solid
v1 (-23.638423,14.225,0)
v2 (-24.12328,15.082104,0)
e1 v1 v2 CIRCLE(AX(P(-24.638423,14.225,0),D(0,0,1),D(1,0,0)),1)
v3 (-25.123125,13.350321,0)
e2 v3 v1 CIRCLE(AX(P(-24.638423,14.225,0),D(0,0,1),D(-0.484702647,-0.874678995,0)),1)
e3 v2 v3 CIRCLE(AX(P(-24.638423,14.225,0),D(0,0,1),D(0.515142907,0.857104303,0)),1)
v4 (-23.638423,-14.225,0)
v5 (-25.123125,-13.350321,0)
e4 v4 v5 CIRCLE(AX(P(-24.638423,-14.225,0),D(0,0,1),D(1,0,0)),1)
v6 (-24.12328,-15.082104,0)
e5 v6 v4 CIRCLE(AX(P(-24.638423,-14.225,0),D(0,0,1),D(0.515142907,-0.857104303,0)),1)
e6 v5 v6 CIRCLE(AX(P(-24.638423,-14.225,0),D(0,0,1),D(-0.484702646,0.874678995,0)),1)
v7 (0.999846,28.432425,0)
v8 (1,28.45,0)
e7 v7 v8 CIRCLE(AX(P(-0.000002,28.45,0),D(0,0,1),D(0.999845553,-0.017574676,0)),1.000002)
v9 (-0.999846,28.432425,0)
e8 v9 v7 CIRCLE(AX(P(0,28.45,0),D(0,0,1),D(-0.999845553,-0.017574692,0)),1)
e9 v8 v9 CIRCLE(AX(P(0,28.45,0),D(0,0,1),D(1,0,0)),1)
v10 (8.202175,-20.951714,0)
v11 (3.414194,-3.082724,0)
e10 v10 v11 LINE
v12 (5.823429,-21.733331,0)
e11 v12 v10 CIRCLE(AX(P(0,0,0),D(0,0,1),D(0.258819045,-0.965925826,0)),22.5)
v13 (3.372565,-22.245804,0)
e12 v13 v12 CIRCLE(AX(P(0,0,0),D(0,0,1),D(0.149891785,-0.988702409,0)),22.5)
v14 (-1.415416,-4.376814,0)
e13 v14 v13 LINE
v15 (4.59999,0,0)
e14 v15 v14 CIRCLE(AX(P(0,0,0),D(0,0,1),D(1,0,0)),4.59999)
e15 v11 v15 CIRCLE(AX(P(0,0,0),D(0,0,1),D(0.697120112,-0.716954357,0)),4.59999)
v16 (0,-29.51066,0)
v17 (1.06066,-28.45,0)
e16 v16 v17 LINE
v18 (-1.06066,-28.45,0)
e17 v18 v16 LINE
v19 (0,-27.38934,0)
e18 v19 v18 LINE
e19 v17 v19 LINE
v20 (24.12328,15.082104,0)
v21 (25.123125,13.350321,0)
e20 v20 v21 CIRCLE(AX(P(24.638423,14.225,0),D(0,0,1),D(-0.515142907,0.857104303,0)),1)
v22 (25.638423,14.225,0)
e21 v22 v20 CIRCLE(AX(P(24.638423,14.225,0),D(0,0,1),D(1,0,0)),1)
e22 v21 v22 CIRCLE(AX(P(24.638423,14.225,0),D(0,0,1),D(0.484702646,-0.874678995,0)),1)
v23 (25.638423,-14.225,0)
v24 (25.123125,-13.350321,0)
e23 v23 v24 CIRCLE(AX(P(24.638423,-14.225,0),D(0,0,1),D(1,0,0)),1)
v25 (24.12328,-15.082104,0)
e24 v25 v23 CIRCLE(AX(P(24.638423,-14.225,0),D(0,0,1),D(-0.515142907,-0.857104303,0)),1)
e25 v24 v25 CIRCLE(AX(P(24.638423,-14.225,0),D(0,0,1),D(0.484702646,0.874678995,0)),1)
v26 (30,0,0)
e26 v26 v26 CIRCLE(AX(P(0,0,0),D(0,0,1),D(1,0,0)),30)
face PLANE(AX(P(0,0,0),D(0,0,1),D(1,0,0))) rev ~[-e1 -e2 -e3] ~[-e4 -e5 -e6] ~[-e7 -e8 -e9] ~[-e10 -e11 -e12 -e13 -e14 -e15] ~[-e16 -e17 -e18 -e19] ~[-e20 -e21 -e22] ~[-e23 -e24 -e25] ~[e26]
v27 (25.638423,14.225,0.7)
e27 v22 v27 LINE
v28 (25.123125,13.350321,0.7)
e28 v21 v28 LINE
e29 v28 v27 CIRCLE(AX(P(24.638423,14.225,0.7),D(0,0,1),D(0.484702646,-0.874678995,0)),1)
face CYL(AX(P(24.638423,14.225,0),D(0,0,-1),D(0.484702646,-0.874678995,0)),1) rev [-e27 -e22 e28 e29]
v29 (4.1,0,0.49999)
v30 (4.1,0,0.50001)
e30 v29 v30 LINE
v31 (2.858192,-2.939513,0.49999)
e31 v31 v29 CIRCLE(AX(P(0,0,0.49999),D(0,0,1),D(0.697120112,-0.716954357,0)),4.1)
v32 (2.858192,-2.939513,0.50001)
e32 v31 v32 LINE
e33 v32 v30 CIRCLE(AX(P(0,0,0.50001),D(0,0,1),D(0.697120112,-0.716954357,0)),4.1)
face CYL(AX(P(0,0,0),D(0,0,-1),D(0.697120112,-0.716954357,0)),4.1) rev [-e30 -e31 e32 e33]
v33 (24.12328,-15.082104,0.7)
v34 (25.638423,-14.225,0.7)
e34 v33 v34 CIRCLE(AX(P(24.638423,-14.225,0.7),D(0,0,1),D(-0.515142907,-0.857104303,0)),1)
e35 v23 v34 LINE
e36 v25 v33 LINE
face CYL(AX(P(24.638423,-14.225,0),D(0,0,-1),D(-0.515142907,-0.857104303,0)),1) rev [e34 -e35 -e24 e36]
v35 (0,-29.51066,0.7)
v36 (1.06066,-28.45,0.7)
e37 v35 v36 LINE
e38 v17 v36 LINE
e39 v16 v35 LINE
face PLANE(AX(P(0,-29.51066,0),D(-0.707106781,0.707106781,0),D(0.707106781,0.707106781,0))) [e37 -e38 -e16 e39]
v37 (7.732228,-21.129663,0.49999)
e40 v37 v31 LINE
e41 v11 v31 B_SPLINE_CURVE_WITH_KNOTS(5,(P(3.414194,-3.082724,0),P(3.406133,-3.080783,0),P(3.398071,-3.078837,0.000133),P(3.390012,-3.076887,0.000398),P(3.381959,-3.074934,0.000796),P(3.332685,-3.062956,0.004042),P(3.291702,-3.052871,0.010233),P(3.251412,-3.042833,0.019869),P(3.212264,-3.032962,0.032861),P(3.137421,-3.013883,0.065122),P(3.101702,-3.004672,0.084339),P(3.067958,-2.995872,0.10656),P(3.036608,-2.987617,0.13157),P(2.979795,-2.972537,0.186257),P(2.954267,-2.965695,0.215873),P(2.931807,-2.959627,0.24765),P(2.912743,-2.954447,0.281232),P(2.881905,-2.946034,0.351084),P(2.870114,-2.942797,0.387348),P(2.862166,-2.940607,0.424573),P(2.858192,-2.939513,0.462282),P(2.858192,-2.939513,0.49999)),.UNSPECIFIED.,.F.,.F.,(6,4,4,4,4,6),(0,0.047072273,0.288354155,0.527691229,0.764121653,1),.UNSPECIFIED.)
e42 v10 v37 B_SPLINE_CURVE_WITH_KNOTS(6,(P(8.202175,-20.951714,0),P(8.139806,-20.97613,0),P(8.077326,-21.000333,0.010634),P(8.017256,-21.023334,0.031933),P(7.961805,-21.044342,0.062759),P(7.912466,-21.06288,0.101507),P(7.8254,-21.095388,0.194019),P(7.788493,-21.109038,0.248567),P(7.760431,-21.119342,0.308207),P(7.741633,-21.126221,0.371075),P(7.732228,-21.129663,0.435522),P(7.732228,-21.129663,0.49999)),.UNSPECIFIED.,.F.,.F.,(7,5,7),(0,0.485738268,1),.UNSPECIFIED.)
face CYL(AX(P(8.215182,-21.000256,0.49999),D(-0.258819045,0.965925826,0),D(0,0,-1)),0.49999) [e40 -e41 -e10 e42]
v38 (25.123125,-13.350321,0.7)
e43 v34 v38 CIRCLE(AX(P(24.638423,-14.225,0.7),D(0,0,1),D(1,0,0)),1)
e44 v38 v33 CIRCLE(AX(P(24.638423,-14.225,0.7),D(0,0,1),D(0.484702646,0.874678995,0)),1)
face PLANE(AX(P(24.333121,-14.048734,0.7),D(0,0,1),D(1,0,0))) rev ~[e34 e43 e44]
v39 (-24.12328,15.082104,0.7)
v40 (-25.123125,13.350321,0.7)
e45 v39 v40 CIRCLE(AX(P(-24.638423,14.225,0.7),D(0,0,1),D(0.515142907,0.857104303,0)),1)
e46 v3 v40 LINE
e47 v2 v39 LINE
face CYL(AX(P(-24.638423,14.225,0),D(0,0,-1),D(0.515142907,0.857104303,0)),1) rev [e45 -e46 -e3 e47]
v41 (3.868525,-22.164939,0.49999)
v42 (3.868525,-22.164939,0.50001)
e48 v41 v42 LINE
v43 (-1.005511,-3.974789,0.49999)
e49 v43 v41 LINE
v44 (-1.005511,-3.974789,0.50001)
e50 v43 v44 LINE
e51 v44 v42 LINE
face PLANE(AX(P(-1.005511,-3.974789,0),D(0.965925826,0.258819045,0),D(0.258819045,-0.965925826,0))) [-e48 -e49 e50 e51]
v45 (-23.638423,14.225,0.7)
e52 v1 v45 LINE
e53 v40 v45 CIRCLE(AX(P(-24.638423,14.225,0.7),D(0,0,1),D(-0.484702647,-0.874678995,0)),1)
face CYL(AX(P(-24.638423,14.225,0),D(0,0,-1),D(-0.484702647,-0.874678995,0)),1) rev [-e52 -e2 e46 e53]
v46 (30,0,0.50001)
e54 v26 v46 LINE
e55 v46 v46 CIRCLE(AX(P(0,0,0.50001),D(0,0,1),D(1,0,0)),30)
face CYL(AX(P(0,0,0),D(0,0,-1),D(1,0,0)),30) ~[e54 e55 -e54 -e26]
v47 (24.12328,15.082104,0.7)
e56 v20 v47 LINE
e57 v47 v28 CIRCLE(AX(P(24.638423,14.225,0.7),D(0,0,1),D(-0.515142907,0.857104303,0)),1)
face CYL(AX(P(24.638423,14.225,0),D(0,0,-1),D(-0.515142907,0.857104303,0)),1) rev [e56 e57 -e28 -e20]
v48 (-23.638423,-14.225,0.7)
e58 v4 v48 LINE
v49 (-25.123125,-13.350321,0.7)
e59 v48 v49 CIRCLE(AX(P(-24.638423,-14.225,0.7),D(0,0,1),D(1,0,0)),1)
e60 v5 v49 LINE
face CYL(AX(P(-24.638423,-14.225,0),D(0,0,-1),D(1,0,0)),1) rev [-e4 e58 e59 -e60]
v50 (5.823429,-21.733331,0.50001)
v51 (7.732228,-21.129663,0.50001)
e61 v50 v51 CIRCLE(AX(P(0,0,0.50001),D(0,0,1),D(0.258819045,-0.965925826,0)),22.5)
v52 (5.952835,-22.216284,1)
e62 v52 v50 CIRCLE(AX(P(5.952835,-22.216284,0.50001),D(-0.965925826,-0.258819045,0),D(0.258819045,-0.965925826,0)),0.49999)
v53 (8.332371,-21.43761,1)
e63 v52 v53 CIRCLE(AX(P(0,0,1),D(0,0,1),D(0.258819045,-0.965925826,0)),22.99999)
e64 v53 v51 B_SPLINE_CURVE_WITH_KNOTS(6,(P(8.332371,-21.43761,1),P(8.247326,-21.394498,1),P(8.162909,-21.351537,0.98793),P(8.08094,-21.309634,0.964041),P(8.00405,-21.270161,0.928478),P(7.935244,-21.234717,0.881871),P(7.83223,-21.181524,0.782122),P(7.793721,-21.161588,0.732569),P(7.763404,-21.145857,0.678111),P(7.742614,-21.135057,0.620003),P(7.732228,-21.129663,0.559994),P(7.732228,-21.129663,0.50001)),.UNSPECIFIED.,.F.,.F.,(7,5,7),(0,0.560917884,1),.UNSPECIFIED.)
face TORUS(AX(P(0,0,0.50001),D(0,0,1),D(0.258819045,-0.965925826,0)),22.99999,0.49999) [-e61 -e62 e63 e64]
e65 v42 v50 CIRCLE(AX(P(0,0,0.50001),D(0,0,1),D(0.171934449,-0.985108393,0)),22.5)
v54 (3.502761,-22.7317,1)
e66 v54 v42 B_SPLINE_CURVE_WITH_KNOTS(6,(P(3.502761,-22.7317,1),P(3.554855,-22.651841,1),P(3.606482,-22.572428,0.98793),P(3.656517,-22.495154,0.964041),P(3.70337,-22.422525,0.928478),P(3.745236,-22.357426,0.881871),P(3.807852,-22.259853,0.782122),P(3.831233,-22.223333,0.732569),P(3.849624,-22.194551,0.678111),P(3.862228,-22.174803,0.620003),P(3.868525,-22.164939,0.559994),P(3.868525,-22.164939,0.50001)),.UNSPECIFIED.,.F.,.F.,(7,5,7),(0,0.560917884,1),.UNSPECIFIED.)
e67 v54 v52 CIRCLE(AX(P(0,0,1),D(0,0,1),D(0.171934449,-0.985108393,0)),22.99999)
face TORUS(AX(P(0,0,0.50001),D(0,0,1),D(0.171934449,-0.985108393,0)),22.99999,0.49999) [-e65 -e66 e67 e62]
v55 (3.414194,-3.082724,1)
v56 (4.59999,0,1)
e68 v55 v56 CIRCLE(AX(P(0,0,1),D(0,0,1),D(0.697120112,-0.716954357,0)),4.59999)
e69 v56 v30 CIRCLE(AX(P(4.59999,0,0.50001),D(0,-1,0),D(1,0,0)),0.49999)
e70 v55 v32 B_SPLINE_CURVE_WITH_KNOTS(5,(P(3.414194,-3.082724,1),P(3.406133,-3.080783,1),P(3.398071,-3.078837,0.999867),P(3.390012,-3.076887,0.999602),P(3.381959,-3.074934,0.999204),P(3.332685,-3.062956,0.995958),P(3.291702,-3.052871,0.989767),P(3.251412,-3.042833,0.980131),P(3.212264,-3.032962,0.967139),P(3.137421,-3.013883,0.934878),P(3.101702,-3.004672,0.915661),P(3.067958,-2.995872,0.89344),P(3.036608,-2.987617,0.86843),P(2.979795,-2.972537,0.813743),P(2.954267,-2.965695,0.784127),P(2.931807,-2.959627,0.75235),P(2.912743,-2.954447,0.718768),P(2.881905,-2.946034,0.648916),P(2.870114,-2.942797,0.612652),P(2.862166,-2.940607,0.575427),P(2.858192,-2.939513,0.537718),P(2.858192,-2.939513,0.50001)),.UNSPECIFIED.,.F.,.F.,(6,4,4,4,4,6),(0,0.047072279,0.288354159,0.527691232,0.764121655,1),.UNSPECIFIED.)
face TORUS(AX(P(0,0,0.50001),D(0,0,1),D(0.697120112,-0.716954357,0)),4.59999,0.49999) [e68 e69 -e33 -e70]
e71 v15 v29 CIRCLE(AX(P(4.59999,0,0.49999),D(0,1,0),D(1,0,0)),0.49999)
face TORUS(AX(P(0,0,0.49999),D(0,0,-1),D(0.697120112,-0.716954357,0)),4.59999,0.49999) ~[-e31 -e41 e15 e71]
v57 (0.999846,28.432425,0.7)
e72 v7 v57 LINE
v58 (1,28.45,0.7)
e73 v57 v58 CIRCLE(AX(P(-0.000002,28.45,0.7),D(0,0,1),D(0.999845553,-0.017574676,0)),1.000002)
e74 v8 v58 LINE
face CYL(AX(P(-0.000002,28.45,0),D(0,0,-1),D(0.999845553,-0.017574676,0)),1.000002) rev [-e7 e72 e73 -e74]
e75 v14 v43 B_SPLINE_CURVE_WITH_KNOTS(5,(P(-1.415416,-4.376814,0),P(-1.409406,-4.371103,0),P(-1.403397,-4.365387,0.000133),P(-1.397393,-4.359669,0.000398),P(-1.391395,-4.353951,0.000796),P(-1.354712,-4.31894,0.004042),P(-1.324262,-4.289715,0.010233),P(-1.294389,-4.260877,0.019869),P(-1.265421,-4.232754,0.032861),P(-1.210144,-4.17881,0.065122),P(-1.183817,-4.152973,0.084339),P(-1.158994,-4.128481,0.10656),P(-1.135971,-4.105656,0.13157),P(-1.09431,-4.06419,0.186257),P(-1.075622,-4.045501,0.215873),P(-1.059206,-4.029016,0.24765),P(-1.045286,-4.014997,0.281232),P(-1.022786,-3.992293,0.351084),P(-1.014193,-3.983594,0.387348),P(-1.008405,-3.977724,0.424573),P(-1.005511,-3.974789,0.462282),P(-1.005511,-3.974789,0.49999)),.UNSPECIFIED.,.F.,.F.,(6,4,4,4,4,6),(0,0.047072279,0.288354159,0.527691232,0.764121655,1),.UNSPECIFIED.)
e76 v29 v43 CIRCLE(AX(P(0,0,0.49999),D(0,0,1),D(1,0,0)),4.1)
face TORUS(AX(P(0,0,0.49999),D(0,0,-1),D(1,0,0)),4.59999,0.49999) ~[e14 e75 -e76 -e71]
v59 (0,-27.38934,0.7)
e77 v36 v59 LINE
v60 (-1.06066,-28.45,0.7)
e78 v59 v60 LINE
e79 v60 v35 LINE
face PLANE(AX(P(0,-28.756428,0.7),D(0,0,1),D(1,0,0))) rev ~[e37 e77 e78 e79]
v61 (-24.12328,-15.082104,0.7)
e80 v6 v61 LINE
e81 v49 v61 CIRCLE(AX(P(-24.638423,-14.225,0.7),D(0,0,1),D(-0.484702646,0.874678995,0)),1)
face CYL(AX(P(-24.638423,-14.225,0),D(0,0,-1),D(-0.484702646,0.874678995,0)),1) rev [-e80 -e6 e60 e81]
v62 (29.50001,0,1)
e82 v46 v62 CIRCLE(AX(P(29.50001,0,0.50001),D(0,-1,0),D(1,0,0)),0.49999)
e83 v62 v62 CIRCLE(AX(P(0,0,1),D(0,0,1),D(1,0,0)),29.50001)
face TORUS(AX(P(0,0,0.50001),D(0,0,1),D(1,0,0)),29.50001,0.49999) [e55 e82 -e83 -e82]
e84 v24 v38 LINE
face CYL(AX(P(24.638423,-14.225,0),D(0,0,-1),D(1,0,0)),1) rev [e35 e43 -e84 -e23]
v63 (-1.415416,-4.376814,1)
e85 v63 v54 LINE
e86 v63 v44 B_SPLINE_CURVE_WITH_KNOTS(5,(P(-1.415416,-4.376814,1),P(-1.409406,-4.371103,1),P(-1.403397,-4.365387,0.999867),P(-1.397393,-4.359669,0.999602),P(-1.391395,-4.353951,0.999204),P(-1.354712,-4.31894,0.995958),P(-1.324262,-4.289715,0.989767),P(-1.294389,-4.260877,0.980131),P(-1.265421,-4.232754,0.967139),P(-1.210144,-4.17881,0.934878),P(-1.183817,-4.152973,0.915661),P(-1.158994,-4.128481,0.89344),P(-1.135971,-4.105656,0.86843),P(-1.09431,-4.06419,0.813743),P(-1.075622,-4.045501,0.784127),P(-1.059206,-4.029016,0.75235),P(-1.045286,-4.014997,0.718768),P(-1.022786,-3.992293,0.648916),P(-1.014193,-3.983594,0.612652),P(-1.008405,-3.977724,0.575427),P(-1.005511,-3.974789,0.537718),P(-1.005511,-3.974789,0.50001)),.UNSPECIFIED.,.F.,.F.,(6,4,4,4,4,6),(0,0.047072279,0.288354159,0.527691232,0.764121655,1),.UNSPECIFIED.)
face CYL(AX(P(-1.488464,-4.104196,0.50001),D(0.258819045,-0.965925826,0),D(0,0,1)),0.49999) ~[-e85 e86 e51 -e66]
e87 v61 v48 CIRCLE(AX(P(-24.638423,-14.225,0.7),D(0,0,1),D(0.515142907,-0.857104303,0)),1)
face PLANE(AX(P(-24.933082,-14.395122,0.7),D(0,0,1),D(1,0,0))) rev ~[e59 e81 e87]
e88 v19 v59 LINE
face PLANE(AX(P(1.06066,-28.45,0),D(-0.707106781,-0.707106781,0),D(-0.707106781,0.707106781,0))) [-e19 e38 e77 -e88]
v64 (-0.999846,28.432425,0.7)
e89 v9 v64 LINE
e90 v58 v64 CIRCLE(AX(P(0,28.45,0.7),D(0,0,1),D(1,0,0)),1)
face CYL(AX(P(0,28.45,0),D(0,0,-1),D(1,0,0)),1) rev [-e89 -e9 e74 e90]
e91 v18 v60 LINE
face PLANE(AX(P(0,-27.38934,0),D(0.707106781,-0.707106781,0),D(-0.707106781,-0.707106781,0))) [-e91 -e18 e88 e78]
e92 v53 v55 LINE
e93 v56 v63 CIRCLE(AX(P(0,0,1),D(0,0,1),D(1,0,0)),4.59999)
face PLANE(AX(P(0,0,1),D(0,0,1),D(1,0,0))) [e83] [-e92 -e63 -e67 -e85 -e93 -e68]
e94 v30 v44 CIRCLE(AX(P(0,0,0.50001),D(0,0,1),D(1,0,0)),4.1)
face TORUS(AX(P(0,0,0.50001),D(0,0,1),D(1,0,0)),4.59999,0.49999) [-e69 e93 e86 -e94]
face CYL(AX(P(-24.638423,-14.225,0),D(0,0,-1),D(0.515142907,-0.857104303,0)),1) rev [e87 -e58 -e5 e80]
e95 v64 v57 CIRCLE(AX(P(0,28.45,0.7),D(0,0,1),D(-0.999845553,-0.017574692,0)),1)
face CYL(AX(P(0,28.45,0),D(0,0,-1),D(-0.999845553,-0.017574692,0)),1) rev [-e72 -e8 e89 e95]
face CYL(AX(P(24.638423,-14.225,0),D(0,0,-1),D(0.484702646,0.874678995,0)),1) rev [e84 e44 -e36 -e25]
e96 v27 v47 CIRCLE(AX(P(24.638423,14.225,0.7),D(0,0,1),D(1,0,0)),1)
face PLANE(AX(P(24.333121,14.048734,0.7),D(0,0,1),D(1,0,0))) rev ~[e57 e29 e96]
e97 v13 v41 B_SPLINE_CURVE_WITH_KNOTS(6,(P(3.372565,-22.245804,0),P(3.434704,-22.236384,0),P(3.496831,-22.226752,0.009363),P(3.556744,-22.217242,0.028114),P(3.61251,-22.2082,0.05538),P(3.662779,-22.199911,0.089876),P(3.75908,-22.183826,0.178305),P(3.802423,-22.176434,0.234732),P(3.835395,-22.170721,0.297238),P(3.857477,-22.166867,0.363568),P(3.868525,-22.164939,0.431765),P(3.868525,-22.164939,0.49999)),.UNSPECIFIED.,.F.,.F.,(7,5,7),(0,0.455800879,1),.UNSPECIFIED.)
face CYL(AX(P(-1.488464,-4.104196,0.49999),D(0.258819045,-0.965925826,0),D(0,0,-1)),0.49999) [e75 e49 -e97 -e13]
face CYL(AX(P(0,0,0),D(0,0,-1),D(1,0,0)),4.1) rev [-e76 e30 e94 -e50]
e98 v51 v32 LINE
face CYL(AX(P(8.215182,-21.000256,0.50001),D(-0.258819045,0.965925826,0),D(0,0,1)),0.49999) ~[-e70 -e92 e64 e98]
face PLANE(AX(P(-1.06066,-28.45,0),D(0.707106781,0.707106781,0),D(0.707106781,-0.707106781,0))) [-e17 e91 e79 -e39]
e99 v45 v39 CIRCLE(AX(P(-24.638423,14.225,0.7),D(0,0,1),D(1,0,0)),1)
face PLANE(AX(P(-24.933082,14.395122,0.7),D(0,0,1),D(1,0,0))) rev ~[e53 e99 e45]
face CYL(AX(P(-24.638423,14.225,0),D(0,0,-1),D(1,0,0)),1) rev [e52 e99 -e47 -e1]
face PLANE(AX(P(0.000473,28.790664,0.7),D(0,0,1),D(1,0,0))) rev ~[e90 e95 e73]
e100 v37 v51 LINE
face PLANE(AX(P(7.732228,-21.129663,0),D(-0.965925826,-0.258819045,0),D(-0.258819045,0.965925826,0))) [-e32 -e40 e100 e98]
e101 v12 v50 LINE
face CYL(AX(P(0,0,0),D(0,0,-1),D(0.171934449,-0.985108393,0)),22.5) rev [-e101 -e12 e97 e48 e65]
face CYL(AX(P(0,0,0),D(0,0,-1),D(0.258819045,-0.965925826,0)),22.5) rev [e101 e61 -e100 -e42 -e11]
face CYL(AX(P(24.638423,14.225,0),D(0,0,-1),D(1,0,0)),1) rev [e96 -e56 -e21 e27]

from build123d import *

# Parameters (mm, degrees)
F1_R     = 30
F1_R_2   = 29
F2_DEPTH = 1
F3_DEPTH = 1
F5_DEPTH = 1
F6_DEPTH = 0.7
F8_DEPTH = 1
F9_R     = 0.49999


# Not quite as in the source:
# - a fillet or chamfer is up to 0.001 mm smaller than in the source, because OpenCascade refuses the exact size
# - a feature names something its author has since deleted; it is built from what else it names


with BuildPart() as f2:
    # F1 (on Top) → F2 (new body)
    with BuildSketch(Plane.XY):
        Circle(F1_R)
        Circle(F1_R_2, mode=Mode.SUBTRACT)
    extrude(amount=F2_DEPTH)

    # F1 (on Top) → F3 (join)
    with BuildSketch(Plane.XY):
        Circle(F1_R)
        Circle(F1_R_2, mode=Mode.SUBTRACT)
        Circle(F1_R_2)
    extrude(amount=F3_DEPTH)

    # F4 (on Top) → F5 (join)
    with BuildSketch(Plane.XY):
        with BuildLine():
            ThreePointArc((-23.1384227377, 14.225), (-23.3296108799, 14.9578106993), (-23.8544380991, 15.5038151104))
            ThreePointArc((-23.8544380991, 15.5038151104), (-23.9897856273, 15.2935504561), (-24.123279831, 15.0821043027))
            ThreePointArc((-24.123279831, 15.0821043027), (-23.7680369305, 14.7173703349), (-23.6384227377, 14.225))
            ThreePointArc((-23.6384227377, 14.225), (-24.130831685, 13.3634018783), (-25.1231253841, 13.3503210049))
            ThreePointArc((-25.1231253841, 13.3503210049), (-25.2394960227, 13.1289885565), (-25.3539167907, 12.9066418316))
            ThreePointArc((-25.3539167907, 12.9066418316), (-23.8713637698, 12.9359613893), (-23.1384227377, 14.225))
        make_face()
        with BuildLine():
            ThreePointArc((-24.123279831, 15.0821043027), (-23.9897856273, 15.2935504561), (-23.8544380991, 15.5038151104))
            ThreePointArc((-23.8544380991, 15.5038151104), (-25.9374608433, 14.975), (-25.3539167907, 12.9066418316))
            ThreePointArc((-25.3539167907, 12.9066418316), (-25.2394960227, 13.1289885565), (-25.1231253841, 13.3503210049))
            ThreePointArc((-25.1231253841, 13.3503210049), (-25.5044481415, 14.725), (-24.123279831, 15.0821043027))
        make_face()
        with BuildLine():
            ThreePointArc((-1.4994786916, 28.410456942), (0, 26.95), (1.4994786916, 28.410456942))
            ThreePointArc((1.4994786916, 28.410456942), (1.2497103954, 28.4225390127), (0.9998455532, 28.4324253076))
            ThreePointArc((0.9998455532, 28.4324253076), (0, 27.45), (-0.9998455532, 28.4324253076))
            ThreePointArc((-0.9998455532, 28.4324253076), (-1.2497103954, 28.4225390127), (-1.4994786916, 28.410456942))
        make_face()
        with BuildLine():
            ThreePointArc((0.9998455532, 28.4324253076), (1.2497103954, 28.4225390127), (1.4994786916, 28.410456942))
            ThreePointArc((1.4994786916, 28.410456942), (1.4998696672, 28.4302267529), (1.5, 28.45))
            ThreePointArc((1.5, 28.45), (-0.0197732471, 29.9498696672), (-1.4994786916, 28.410456942))
            ThreePointArc((-1.4994786916, 28.410456942), (-1.2497103954, 28.4225390127), (-0.9998455532, 28.4324253076))
            ThreePointArc((-0.9998455532, 28.4324253076), (-0.0087876855, 29.4499613875), (1, 28.45))
            ThreePointArc((1, 28.45), (0.9999613875, 28.4412123145), (0.9998455532, 28.4324253076))
        make_face()
        with BuildLine():
            ThreePointArc((25.1231253841, 13.3503210049), (25.2394960227, 13.1289885565), (25.3539167907, 12.9066418316))
            ThreePointArc((25.3539167907, 12.9066418316), (25.9274613483, 13.4579410321), (26.1384227377, 14.225))
            ThreePointArc((26.1384227377, 14.225), (25.371233437, 15.5338118577), (23.8544380991, 15.5038151104))
            ThreePointArc((23.8544380991, 15.5038151104), (23.9897856273, 15.2935504561), (24.123279831, 15.0821043027))
            ThreePointArc((24.123279831, 15.0821043027), (25.1307930725, 15.0953858072), (25.6384227377, 14.225))
            ThreePointArc((25.6384227377, 14.225), (25.5000208593, 13.7174089473), (25.1231253841, 13.3503210049))
        make_face()
        with BuildLine():
            ThreePointArc((23.8544380991, 15.5038151104), (23.339384632, 13.475), (25.3539167907, 12.9066418316))
            ThreePointArc((25.3539167907, 12.9066418316), (25.2394960227, 13.1289885565), (25.1231253841, 13.3503210049))
            ThreePointArc((25.1231253841, 13.3503210049), (23.7723973339, 13.725), (24.123279831, 15.0821043027))
            ThreePointArc((24.123279831, 15.0821043027), (23.9897856273, 15.2935504561), (23.8544380991, 15.5038151104))
        make_face()
        with BuildLine():
            ThreePointArc((-24.123279831, -15.0821043027), (-23.9897856273, -15.2935504561), (-23.8544380991, -15.5038151104))
            ThreePointArc((-23.8544380991, -15.5038151104), (-23.3296108799, -14.9578106993), (-23.1384227377, -14.225))
            ThreePointArc((-23.1384227377, -14.225), (-23.8713637698, -12.9359613893), (-25.3539167907, -12.9066418316))
            ThreePointArc((-25.3539167907, -12.9066418316), (-25.2394960227, -13.1289885565), (-25.1231253841, -13.3503210049))
            ThreePointArc((-25.1231253841, -13.3503210049), (-24.130831685, -13.3634018783), (-23.6384227377, -14.225))
            ThreePointArc((-23.6384227377, -14.225), (-23.7680369305, -14.7173703349), (-24.123279831, -15.0821043027))
        make_face()
        with BuildLine():
            ThreePointArc((-25.3539167907, -12.9066418316), (-25.9374608433, -14.975), (-23.8544380991, -15.5038151104))
            ThreePointArc((-23.8544380991, -15.5038151104), (-23.9897856273, -15.2935504561), (-24.123279831, -15.0821043027))
            ThreePointArc((-24.123279831, -15.0821043027), (-25.5044481415, -14.725), (-25.1231253841, -13.3503210049))
            ThreePointArc((-25.1231253841, -13.3503210049), (-25.2394960227, -13.1289885565), (-25.3539167907, -12.9066418316))
        make_face()
        with BuildLine():
            ThreePointArc((1.0415869357, -28.4309267639), (1.2705740372, -28.4216139868), (1.4994786916, -28.410456942))
            ThreePointArc((1.4994786916, -28.410456942), (0, -26.95), (-1.4994786916, -28.410456942))
            ThreePointArc((-1.4994786916, -28.410456942), (-1.2705740372, -28.4216139868), (-1.0415869357, -28.4309267639))
            Line((-1.0415869357, -28.4309267639), (0, -27.3893398282))
            Line((0, -27.3893398282), (1.0415869357, -28.4309267639))
        make_face()
        with BuildLine():
            ThreePointArc((1.5, -28.45), (1.4998696672, -28.4302267529), (1.4994786916, -28.410456942))
            ThreePointArc((1.4994786916, -28.410456942), (1.2705740372, -28.4216139868), (1.0415869357, -28.4309267639))
            Line((1.0415869357, -28.4309267639), (1.0606601718, -28.45))
            Line((1.0606601718, -28.45), (0, -29.5106601718))
            Line((0, -29.5106601718), (-1.0606601718, -28.45))
            Line((-1.0606601718, -28.45), (-1.0415869357, -28.4309267639))
            ThreePointArc((-1.0415869357, -28.4309267639), (-1.2705740372, -28.4216139868), (-1.4994786916, -28.410456942))
            ThreePointArc((-1.4994786916, -28.410456942), (-0.0197732471, -29.9498696672), (1.5, -28.45))
        make_face()
        with BuildLine():
            ThreePointArc((26.1384227377, -14.225), (25.9274613483, -13.4579410321), (25.3539167907, -12.9066418316))
            ThreePointArc((25.3539167907, -12.9066418316), (25.2394960227, -13.1289885565), (25.1231253841, -13.3503210049))
            ThreePointArc((25.1231253841, -13.3503210049), (25.5000208593, -13.7174089473), (25.6384227377, -14.225))
            ThreePointArc((25.6384227377, -14.225), (25.1307930725, -15.0953858072), (24.123279831, -15.0821043027))
            ThreePointArc((24.123279831, -15.0821043027), (23.9897856273, -15.2935504561), (23.8544380991, -15.5038151104))
            ThreePointArc((23.8544380991, -15.5038151104), (25.371233437, -15.5338118577), (26.1384227377, -14.225))
        make_face()
        with BuildLine():
            ThreePointArc((25.1231253841, -13.3503210049), (25.2394960227, -13.1289885565), (25.3539167907, -12.9066418316))
            ThreePointArc((25.3539167907, -12.9066418316), (23.339384632, -13.475), (23.8544380991, -15.5038151104))
            ThreePointArc((23.8544380991, -15.5038151104), (23.9897856273, -15.2935504561), (24.123279831, -15.0821043027))
            ThreePointArc((24.123279831, -15.0821043027), (23.7723973339, -13.725), (25.1231253841, -13.3503210049))
        make_face()
        with BuildLine():
            ThreePointArc((-23.6384227377, 14.225), (-23.7680369305, 14.7173703349), (-24.123279831, 15.0821043027))
            ThreePointArc((-24.123279831, 15.0821043027), (-24.6384227377, 14.225), (-25.1231253841, 13.3503210049))
            ThreePointArc((-25.1231253841, 13.3503210049), (-24.130831685, 13.3634018783), (-23.6384227377, 14.225))
        make_face()
        with BuildLine():
            ThreePointArc((-25.1231253841, 13.3503210049), (-24.6384227377, 14.225), (-24.123279831, 15.0821043027))
            ThreePointArc((-24.123279831, 15.0821043027), (-25.5044481415, 14.725), (-25.1231253841, 13.3503210049))
        make_face()
        with BuildLine():
            ThreePointArc((-0.9998455532, 28.4324253076), (0, 28.45), (0.9998455532, 28.4324253076))
            ThreePointArc((0.9998455532, 28.4324253076), (0.9999613875, 28.4412123145), (1, 28.45))
            ThreePointArc((1, 28.45), (-0.0087876855, 29.4499613875), (-0.9998455532, 28.4324253076))
        make_face()
        with BuildLine():
            ThreePointArc((-0.9998455532, 28.4324253076), (0, 27.45), (0.9998455532, 28.4324253076))
            ThreePointArc((0.9998455532, 28.4324253076), (0, 28.45), (-0.9998455532, 28.4324253076))
        make_face()
        with BuildLine():
            ThreePointArc((24.123279831, 15.0821043027), (24.6384227377, 14.225), (25.1231253841, 13.3503210049))
            ThreePointArc((25.1231253841, 13.3503210049), (25.5000208593, 13.7174089473), (25.6384227377, 14.225))
            ThreePointArc((25.6384227377, 14.225), (25.1307930725, 15.0953858072), (24.123279831, 15.0821043027))
        make_face()
        with BuildLine():
            ThreePointArc((24.123279831, 15.0821043027), (23.7723973339, 13.725), (25.1231253841, 13.3503210049))
            ThreePointArc((25.1231253841, 13.3503210049), (24.6384227377, 14.225), (24.123279831, 15.0821043027))
        make_face()
        with BuildLine():
            ThreePointArc((25.6384227377, -14.225), (25.5000208593, -13.7174089473), (25.1231253841, -13.3503210049))
            ThreePointArc((25.1231253841, -13.3503210049), (24.6384227377, -14.225), (24.123279831, -15.0821043027))
            ThreePointArc((24.123279831, -15.0821043027), (25.1307930725, -15.0953858072), (25.6384227377, -14.225))
        make_face()
        with BuildLine():
            ThreePointArc((24.123279831, -15.0821043027), (24.6384227377, -14.225), (25.1231253841, -13.3503210049))
            ThreePointArc((25.1231253841, -13.3503210049), (23.7723973339, -13.725), (24.123279831, -15.0821043027))
        make_face()
        with BuildLine():
            Line((1.0606601718, -28.45), (1.0415869357, -28.4309267639))
            ThreePointArc((1.0415869357, -28.4309267639), (0, -28.45), (-1.0415869357, -28.4309267639))
            Line((-1.0415869357, -28.4309267639), (-1.0606601718, -28.45))
            Line((-1.0606601718, -28.45), (0, -29.5106601718))
            Line((0, -29.5106601718), (1.0606601718, -28.45))
        make_face()
        with BuildLine():
            ThreePointArc((-25.1231253841, -13.3503210049), (-25.5044481415, -14.725), (-24.123279831, -15.0821043027))
            ThreePointArc((-24.123279831, -15.0821043027), (-24.6384227377, -14.225), (-25.1231253841, -13.3503210049))
        make_face()
        with BuildLine():
            ThreePointArc((-25.1231253841, -13.3503210049), (-24.6384227377, -14.225), (-24.123279831, -15.0821043027))
            ThreePointArc((-24.123279831, -15.0821043027), (-23.7680369305, -14.7173703349), (-23.6384227377, -14.225))
            ThreePointArc((-23.6384227377, -14.225), (-24.130831685, -13.3634018783), (-25.1231253841, -13.3503210049))
        make_face()
        with BuildLine():
            ThreePointArc((-1.0415869357, -28.4309267639), (0, -28.45), (1.0415869357, -28.4309267639))
            Line((1.0415869357, -28.4309267639), (0, -27.3893398282))
            Line((0, -27.3893398282), (-1.0415869357, -28.4309267639))
        make_face()
    extrude(amount=F5_DEPTH)

    # F4 (on Top) → F6 (cut)
    with BuildSketch(Plane.XY):
        with BuildLine():
            ThreePointArc((-25.1231253841, 13.3503210049), (-24.6384227377, 14.225), (-24.123279831, 15.0821043027))
            ThreePointArc((-24.123279831, 15.0821043027), (-25.5044481415, 14.725), (-25.1231253841, 13.3503210049))
        make_face()
        with BuildLine():
            ThreePointArc((-23.6384227377, 14.225), (-23.7680369305, 14.7173703349), (-24.123279831, 15.0821043027))
            ThreePointArc((-24.123279831, 15.0821043027), (-24.6384227377, 14.225), (-25.1231253841, 13.3503210049))
            ThreePointArc((-25.1231253841, 13.3503210049), (-24.130831685, 13.3634018783), (-23.6384227377, 14.225))
        make_face()
        with BuildLine():
            ThreePointArc((-0.9998455532, 28.4324253076), (0, 28.45), (0.9998455532, 28.4324253076))
            ThreePointArc((0.9998455532, 28.4324253076), (0.9999613875, 28.4412123145), (1, 28.45))
            ThreePointArc((1, 28.45), (-0.0087876855, 29.4499613875), (-0.9998455532, 28.4324253076))
        make_face()
        with BuildLine():
            ThreePointArc((-0.9998455532, 28.4324253076), (0, 27.45), (0.9998455532, 28.4324253076))
            ThreePointArc((0.9998455532, 28.4324253076), (0, 28.45), (-0.9998455532, 28.4324253076))
        make_face()
        with BuildLine():
            ThreePointArc((24.123279831, 15.0821043027), (23.7723973339, 13.725), (25.1231253841, 13.3503210049))
            ThreePointArc((25.1231253841, 13.3503210049), (24.6384227377, 14.225), (24.123279831, 15.0821043027))
        make_face()
        with BuildLine():
            ThreePointArc((24.123279831, 15.0821043027), (24.6384227377, 14.225), (25.1231253841, 13.3503210049))
            ThreePointArc((25.1231253841, 13.3503210049), (25.5000208593, 13.7174089473), (25.6384227377, 14.225))
            ThreePointArc((25.6384227377, 14.225), (25.1307930725, 15.0953858072), (24.123279831, 15.0821043027))
        make_face()
        with BuildLine():
            ThreePointArc((24.123279831, -15.0821043027), (24.6384227377, -14.225), (25.1231253841, -13.3503210049))
            ThreePointArc((25.1231253841, -13.3503210049), (23.7723973339, -13.725), (24.123279831, -15.0821043027))
        make_face()
        with BuildLine():
            ThreePointArc((25.6384227377, -14.225), (25.5000208593, -13.7174089473), (25.1231253841, -13.3503210049))
            ThreePointArc((25.1231253841, -13.3503210049), (24.6384227377, -14.225), (24.123279831, -15.0821043027))
            ThreePointArc((24.123279831, -15.0821043027), (25.1307930725, -15.0953858072), (25.6384227377, -14.225))
        make_face()
        with BuildLine():
            Line((1.0606601718, -28.45), (1.0415869357, -28.4309267639))
            ThreePointArc((1.0415869357, -28.4309267639), (0, -28.45), (-1.0415869357, -28.4309267639))
            Line((-1.0415869357, -28.4309267639), (-1.0606601718, -28.45))
            Line((-1.0606601718, -28.45), (0, -29.5106601718))
            Line((0, -29.5106601718), (1.0606601718, -28.45))
        make_face()
        with BuildLine():
            ThreePointArc((-1.0415869357, -28.4309267639), (0, -28.45), (1.0415869357, -28.4309267639))
            Line((1.0415869357, -28.4309267639), (0, -27.3893398282))
            Line((0, -27.3893398282), (-1.0415869357, -28.4309267639))
        make_face()
        with BuildLine():
            ThreePointArc((-25.1231253841, -13.3503210049), (-25.5044481415, -14.725), (-24.123279831, -15.0821043027))
            ThreePointArc((-24.123279831, -15.0821043027), (-24.6384227377, -14.225), (-25.1231253841, -13.3503210049))
        make_face()
        with BuildLine():
            ThreePointArc((-25.1231253841, -13.3503210049), (-24.6384227377, -14.225), (-24.123279831, -15.0821043027))
            ThreePointArc((-24.123279831, -15.0821043027), (-23.7680369305, -14.7173703349), (-23.6384227377, -14.225))
            ThreePointArc((-23.6384227377, -14.225), (-24.130831685, -13.3634018783), (-25.1231253841, -13.3503210049))
        make_face()
    extrude(amount=F6_DEPTH, mode=Mode.SUBTRACT)

    # F7 (on Top) → F8 (cut)
    with BuildSketch(Plane.XY):
        with BuildLine():
            ThreePointArc((2.8581924585, -2.9395128627), (3.7768101011, -1.595526703), (4.1, 0))
            ThreePointArc((4.1, 0), (-2.5186708329, 3.23516572), (-1.0055108466, -3.9747890431))
            ThreePointArc((-1.0055108466, -3.9747890431), (0.0287518116, -4.0998991858), (1.0611580849, -3.9602958878))
            ThreePointArc((1.0611580849, -3.9602958878), (2.0250497936, -3.5649927536), (2.8581924585, -2.9395128627))
        make_face()
        with BuildLine():
            ThreePointArc((1.0611580849, -3.9602958878), (0.0287518116, -4.0998991858), (-1.0055108466, -3.9747890431))
            Line((-1.0055108466, -3.9747890431), (3.8685251002, -22.1649388348))
            ThreePointArc((3.8685251002, -22.1649388348), (4.8507795796, -21.9708884088), (5.8234285148, -21.7333310915))
            Line((5.8234285148, -21.7333310915), (1.0611580849, -3.9602958878))
        make_face()
        with BuildLine():
            Line((7.7322284054, -21.1296626544), (2.8581924585, -2.9395128627))
            ThreePointArc((2.8581924585, -2.9395128627), (2.0250497936, -3.5649927536), (1.0611580849, -3.9602958878))
            Line((1.0611580849, -3.9602958878), (5.8234285148, -21.7333310915))
            ThreePointArc((5.8234285148, -21.7333310915), (6.7845458603, -21.4527372955), (7.7322284054, -21.1296626544))
        make_face()
    extrude(amount=F8_DEPTH, mode=Mode.SUBTRACT)

    # F9 (radius 0.5 in the source; OpenCascade refuses exactly that, so slightly less here)
    f9_edges = [f2.edges().sort_by_distance(p)[0] for p in [
        (-30, 0, 1),
        (-1.061158, 3.960296, 1),
        (1.431507, -13.069864, 1),
        (5.29521, -12.034588, 1),
        (5.29521, -12.034588, 0),
        (-1.061158, 3.960296, 0),
        (1.431507, -13.069864, 0),
        (5.823429, -21.733331, 1),
    ]]
    fillet(f9_edges, radius=F9_R)


solid = f2.part
